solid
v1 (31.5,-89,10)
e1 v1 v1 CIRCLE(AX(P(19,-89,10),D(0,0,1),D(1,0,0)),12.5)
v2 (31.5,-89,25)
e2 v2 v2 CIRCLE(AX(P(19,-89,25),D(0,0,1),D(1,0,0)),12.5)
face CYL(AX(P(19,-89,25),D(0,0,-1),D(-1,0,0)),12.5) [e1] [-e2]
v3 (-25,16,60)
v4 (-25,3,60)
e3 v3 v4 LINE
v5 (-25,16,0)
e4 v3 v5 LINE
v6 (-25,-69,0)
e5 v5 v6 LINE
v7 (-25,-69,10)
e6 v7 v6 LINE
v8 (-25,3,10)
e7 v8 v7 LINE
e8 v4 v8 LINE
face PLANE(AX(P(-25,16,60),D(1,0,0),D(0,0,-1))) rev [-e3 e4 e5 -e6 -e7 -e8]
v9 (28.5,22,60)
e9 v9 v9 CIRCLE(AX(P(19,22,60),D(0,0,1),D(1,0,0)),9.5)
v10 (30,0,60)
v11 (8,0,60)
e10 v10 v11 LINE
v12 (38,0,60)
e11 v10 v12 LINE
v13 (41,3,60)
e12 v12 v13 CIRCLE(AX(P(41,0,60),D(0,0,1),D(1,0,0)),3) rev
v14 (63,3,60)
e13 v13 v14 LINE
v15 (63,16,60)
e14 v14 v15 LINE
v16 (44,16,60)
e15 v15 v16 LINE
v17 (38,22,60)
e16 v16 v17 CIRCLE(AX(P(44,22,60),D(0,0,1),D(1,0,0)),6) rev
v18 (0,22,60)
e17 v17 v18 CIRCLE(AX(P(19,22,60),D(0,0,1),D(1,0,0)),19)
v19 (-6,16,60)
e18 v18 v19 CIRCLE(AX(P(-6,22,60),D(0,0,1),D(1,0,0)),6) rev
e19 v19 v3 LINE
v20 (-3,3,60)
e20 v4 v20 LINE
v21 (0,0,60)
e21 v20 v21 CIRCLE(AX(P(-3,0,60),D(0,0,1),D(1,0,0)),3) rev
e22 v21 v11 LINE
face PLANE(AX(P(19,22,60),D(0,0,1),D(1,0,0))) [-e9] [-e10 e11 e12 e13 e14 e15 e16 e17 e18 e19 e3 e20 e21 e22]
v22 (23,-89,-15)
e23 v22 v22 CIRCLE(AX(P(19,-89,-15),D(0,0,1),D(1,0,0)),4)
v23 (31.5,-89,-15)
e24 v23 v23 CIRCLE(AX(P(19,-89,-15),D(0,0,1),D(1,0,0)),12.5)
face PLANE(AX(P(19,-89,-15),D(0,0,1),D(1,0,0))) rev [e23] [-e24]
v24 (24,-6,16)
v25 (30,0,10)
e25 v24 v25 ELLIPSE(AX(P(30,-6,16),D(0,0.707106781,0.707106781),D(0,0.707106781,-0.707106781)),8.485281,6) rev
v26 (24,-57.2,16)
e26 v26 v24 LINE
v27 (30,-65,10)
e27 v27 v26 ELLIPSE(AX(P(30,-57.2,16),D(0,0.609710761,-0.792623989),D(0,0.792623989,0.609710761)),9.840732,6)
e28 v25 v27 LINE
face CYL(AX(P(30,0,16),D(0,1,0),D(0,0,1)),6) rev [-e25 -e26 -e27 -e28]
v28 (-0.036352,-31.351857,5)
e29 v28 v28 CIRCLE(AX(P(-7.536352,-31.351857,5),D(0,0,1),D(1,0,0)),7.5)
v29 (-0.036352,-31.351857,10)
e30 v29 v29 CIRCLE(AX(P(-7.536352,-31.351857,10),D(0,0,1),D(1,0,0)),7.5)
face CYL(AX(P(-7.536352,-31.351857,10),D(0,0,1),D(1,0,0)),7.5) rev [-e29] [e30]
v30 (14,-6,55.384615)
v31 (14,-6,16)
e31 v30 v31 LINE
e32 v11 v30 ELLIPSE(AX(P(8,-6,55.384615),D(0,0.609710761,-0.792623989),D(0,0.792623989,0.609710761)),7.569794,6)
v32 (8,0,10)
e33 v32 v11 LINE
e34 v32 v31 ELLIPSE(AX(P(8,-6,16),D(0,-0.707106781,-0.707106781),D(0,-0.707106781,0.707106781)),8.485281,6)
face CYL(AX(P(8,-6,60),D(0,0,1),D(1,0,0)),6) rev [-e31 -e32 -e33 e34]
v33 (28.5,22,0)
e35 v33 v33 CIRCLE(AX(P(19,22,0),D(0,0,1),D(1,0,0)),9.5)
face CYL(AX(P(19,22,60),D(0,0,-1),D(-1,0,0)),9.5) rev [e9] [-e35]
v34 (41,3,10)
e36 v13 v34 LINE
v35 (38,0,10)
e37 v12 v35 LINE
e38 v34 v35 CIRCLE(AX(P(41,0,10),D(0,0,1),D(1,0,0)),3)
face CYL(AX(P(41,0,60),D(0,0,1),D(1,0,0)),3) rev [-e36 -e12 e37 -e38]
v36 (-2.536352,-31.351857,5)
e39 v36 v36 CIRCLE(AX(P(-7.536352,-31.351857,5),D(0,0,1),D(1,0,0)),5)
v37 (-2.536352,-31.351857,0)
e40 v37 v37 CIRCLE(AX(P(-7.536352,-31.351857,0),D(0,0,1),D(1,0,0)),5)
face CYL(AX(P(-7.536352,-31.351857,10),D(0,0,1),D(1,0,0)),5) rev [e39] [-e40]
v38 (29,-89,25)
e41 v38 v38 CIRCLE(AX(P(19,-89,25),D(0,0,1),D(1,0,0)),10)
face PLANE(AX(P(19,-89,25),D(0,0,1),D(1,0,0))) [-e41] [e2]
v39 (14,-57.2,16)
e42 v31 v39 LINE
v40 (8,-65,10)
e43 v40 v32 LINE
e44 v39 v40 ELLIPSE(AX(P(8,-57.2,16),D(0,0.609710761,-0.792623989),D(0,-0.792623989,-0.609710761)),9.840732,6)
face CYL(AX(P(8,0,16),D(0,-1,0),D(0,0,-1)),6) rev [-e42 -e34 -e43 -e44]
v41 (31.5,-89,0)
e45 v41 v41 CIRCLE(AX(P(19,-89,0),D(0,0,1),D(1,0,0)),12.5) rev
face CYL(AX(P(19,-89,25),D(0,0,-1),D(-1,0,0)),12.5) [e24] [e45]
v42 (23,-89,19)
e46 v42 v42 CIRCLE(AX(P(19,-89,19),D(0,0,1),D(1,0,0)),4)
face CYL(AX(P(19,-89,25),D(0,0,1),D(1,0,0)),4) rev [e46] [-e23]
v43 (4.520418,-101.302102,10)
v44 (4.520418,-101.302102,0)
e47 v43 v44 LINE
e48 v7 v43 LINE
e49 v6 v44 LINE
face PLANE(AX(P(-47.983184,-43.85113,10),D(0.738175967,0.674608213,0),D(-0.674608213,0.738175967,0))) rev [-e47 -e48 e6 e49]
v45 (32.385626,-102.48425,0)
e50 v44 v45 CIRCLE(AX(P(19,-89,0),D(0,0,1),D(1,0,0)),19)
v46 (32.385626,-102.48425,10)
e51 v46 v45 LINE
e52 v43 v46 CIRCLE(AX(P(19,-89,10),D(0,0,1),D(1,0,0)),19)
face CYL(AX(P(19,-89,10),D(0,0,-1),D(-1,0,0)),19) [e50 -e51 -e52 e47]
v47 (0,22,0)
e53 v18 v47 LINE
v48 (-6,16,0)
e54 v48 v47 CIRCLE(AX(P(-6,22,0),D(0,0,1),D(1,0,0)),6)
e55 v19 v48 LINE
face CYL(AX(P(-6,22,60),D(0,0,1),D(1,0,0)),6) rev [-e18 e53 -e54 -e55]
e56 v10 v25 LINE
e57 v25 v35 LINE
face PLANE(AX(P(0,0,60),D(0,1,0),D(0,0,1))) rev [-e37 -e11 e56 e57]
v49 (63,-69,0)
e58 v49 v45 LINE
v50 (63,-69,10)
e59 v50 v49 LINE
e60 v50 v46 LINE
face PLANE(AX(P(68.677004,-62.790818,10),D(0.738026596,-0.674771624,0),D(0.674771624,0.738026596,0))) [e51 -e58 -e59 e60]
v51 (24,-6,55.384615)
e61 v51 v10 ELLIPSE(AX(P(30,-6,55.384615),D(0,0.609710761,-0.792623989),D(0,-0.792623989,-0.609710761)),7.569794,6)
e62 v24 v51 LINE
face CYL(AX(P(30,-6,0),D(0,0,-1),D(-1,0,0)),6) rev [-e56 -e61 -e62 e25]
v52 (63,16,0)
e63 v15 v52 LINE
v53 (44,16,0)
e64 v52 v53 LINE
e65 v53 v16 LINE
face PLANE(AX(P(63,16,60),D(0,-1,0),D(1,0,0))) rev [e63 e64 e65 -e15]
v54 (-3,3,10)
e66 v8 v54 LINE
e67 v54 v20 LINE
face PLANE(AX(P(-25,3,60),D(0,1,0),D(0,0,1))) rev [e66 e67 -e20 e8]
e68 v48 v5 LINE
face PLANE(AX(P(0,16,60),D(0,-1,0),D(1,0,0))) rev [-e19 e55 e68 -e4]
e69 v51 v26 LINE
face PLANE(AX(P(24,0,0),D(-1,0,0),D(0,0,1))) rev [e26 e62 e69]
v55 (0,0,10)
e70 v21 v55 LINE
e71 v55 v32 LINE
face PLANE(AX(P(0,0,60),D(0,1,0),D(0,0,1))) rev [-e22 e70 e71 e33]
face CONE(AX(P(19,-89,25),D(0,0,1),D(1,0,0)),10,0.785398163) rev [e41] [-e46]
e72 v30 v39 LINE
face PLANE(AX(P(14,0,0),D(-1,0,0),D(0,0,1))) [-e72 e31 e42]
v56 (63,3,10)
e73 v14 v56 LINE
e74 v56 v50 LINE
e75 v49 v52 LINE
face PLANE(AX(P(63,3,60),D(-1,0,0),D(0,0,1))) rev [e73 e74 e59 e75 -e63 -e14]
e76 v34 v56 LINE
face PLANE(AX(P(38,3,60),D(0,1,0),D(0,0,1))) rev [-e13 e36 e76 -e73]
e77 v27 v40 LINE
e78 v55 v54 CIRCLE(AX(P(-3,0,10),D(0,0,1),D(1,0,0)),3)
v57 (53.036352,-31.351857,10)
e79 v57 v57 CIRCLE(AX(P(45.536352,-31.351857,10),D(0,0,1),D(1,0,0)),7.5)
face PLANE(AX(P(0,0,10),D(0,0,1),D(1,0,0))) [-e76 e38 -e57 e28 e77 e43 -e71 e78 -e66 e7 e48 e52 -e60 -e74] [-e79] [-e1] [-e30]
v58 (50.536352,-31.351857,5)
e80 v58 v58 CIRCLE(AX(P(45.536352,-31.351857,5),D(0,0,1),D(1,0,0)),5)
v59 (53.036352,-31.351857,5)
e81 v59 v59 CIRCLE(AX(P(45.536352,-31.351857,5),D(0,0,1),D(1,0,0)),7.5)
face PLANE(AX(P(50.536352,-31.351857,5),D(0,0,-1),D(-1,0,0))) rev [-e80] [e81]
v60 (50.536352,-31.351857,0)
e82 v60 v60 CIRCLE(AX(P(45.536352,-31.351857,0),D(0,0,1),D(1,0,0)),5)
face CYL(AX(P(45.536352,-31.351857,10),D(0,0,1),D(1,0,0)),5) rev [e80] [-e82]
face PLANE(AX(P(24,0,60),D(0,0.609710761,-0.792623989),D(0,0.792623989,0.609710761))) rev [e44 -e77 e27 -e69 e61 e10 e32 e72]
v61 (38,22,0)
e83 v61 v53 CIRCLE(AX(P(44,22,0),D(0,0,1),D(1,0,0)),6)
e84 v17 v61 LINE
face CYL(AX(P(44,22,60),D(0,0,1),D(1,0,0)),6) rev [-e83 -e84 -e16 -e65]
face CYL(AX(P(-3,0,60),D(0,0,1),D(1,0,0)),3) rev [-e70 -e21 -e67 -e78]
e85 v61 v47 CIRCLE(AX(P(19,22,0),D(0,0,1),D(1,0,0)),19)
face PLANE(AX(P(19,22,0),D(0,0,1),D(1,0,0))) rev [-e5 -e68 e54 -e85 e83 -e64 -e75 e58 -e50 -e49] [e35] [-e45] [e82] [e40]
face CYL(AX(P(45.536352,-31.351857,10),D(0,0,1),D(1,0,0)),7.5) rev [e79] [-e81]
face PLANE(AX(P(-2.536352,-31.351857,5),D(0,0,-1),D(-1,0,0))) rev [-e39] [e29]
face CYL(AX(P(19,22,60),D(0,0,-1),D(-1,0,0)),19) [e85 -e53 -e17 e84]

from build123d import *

# Parameters (mm, degrees)
SKETCH1_R           = 9.5
BOSS_EXTRUDE1_DEPTH = 60
BOSS_EXTRUDE2_DEPTH = 10
FILLET1_R           = 6
FILLET2_R           = 6
FILLET3_R           = 3
BOSS_EXTRUDE4_DEPTH = 5
FILLET4_R           = 6
FILLET5_R           = 6
SKETCH6_R           = 12.5
BOSS_EXTRUDE5_DEPTH = 20
HOLE2_D             = 8
HOLE2_DEPTH         = 39.547439867
HOLE2_CSINK_D       = 20
HOLE2_CSINK_ANGLE   = 90
CUT_EXTRUDE1_START  = -40
SKETCH13_R          = 4
CUT_EXTRUDE1_DEPTH  = 40
HOLE4_D             = 10
HOLE4_CBORE_D       = 15
HOLE4_CBORE_DEPTH   = 5


# Some blends are built 0.0001 mm under size
with BuildPart() as part:
    # Sketch1 → Boss-Extrude1 (new body)
    with BuildSketch(Plane.XY):
        with BuildLine():
            Line((0, 0), (38, 0))
            Line((38, 0), (38, 3))
            Line((38, 3), (63, 3))
            Line((63, 3), (63, 16))
            Line((63, 16), (38, 16))
            Line((38, 16), (38, 22))
            ThreePointArc((38, 22), (19, 41), (0, 22))
            Line((0, 22), (0, 16))
            Line((0, 16), (-25, 16))
            Line((-25, 16), (-25, 3))
            Line((-25, 3), (0, 3))
            Line((0, 3), (0, 0))
        make_face()
        with Locations((19, 22)):
            Circle(SKETCH1_R, mode=Mode.SUBTRACT)
    extrude(amount=BOSS_EXTRUDE1_DEPTH)

    # Sketch2 → Boss-Extrude2 (add)
    with BuildSketch(Plane.XY):
        with BuildLine():
            Line((63, -69), (63, 3))
            Line((63, 3), (38, 3))
            Line((38, 3), (38, 0))
            Line((38, 0), (19, 0))
            Line((19, 0), (0, 0))
            Line((0, 0), (0, 3))
            Line((0, 3), (-25, 3))
            Line((-25, 3), (-25, -69))
            Line((-25, -69), (4.520418495, -101.302102237))
            ThreePointArc((4.520418495, -101.302102237), (18.194672039, -107.98292514), (32.385626244, -102.484250445))
            Line((32.385626244, -102.484250445), (33.626524101, -101.127027365))
            Line((33.626524101, -101.127027365), (63, -69))
        make_face()
        with BuildLine():
            ThreePointArc((19, -101.5), (6.5, -89), (19, -76.5))
            ThreePointArc((19, -76.5), (27.838834765, -80.161165235), (31.5, -89))
            ThreePointArc((31.5, -89), (27.838834765, -97.838834765), (19, -101.5))
        make_face(mode=Mode.SUBTRACT)
    extrude(amount=BOSS_EXTRUDE2_DEPTH)

    # Fillet1
    fillet1_edges = [part.edges().sort_by_distance(p)[0] for p in [
        (0, 16, 30),
    ]]
    fillet(fillet1_edges, radius=FILLET1_R - 0.0001)  # a hair under: the kernel refuses the full size

    # Fillet2
    fillet2_edges = [part.edges().sort_by_distance(p)[0] for p in [
        (38, 16, 30),
    ]]
    fillet(fillet2_edges, radius=FILLET2_R - 0.0001)  # a hair under: the kernel refuses the full size

    # Fillet3
    fillet3_edges = [part.edges().sort_by_distance(p)[0] for p in [
        (0, 3, 35),
        (38, 3, 35),
    ]]
    fillet(fillet3_edges, radius=FILLET3_R - 0.0001)  # a hair under: the kernel refuses the full size

    # Sketch4 → Boss-Extrude4 (add, symmetric)
    with BuildSketch(Plane(origin=(19, 0, 0), x_dir=(0, 0, -1), z_dir=(1, 0, 0))):
        Polygon((-60, 0), (-10, -65), (-10, 0), align=None)
    extrude(amount=BOSS_EXTRUDE4_DEPTH, both=True)

    # Fillet4
    # the kernel refuses this fillet: 6 mm, written as the material it adds along each edge
    with BuildSketch(Plane(origin=(14, 0, -5), x_dir=(-1, 0, 0), z_dir=(0, 0, 1))) as fillet4_piece_1_section:
        with BuildLine():
            CenterArc((FILLET4_R, FILLET4_R), FILLET4_R, 180, 90)
            Line((0, FILLET4_R), (0, 0))
            Line((0, 0), (FILLET4_R, 0))
        make_face()
    fillet4_piece_1 = extrude(amount=80, mode=Mode.PRIVATE)
    fillet4_piece_1 = split(fillet4_piece_1, bisect_by=Plane(origin=(12.648095827, -13.156695973, 49.879464636), z_dir=(0, 0.6097107608496924, -0.7926239891046001)), keep=Keep.TOP, mode=Mode.PRIVATE)
    fillet4_piece_1 = split(fillet4_piece_1, bisect_by=Plane(origin=(12.648095827, -1.320325191, 0), z_dir=(0, 0, 1)), keep=Keep.TOP, mode=Mode.PRIVATE)
    add(fillet4_piece_1)
    with BuildSketch(Plane(origin=(24, 0, -5), x_dir=(1, 0, 0), z_dir=(0, 0, 1))) as fillet4_piece_2_section:
        with BuildLine():
            CenterArc((FILLET4_R, -FILLET4_R), FILLET4_R, 90, 90)
            Line((0, -FILLET4_R), (0, 0))
            Line((0, 0), (FILLET4_R, 0))
        make_face()
    fillet4_piece_2 = extrude(amount=80, mode=Mode.PRIVATE)
    fillet4_piece_2 = split(fillet4_piece_2, bisect_by=Plane(origin=(25.351904173, -13.156695973, 49.879464636), z_dir=(0, 0.6097107608496924, -0.7926239891046001)), keep=Keep.TOP, mode=Mode.PRIVATE)
    fillet4_piece_2 = split(fillet4_piece_2, bisect_by=Plane(origin=(25.351904173, -1.320325191, 0), z_dir=(0, 0, 1)), keep=Keep.TOP, mode=Mode.PRIVATE)
    add(fillet4_piece_2)

    # Fillet5
    # the kernel refuses this fillet: 6 mm, written as the material it adds along each edge
    with BuildSketch(Plane(origin=(24, -80, 10), x_dir=(1, 0, 0), z_dir=(0, 1, 0))) as fillet5_piece_1_section:
        with BuildLine():
            CenterArc((FILLET5_R, -FILLET5_R), FILLET5_R, 90, 90)
            Line((0, -FILLET5_R), (0, 0))
            Line((0, 0), (FILLET5_R, 0))
        make_face()
    fillet5_piece_1 = extrude(amount=89, mode=Mode.PRIVATE)
    fillet5_piece_1 = split(fillet5_piece_1, bisect_by=Plane(origin=(25.330544352, -46.320917546, 24.368524964), z_dir=(0, 0.6097107608496924, -0.7926239891046002)), keep=Keep.TOP, mode=Mode.PRIVATE)
    add(fillet5_piece_1)
    with BuildSketch(Plane(origin=(14, -80, 10), x_dir=(-1, 0, 0), z_dir=(0, 1, 0))) as fillet5_piece_2_section:
        with BuildLine():
            CenterArc((FILLET5_R, FILLET5_R), FILLET5_R, 180, 90)
            Line((0, FILLET5_R), (0, 0))
            Line((0, 0), (FILLET5_R, 0))
        make_face()
    fillet5_piece_2 = extrude(amount=89, mode=Mode.PRIVATE)
    fillet5_piece_2 = split(fillet5_piece_2, bisect_by=Plane(origin=(12.669455648, -46.320917546, 24.368524964), z_dir=(0, 0.6097107608496924, -0.7926239891046002)), keep=Keep.TOP, mode=Mode.PRIVATE)
    add(fillet5_piece_2)

    # Sketch6 → Boss-Extrude5 (add, symmetric)
    with BuildSketch(Plane.XY.offset(5)):
        with Locations((19, -89)):
            Circle(SKETCH6_R)
    extrude(amount=BOSS_EXTRUDE5_DEPTH, both=True)

    # Hole2
    with Locations(Plane.XY.offset(25)):
        with Locations((19, -89)):
            CounterSinkHole(HOLE2_D / 2, HOLE2_CSINK_D / 2, depth=HOLE2_DEPTH, counter_sink_angle=HOLE2_CSINK_ANGLE)

    # Sketch13 → Cut-Extrude1 (cut)
    with BuildSketch(Plane.XY.offset(-14.547439867).offset(CUT_EXTRUDE1_START)):
        with Locations((19, -89)):
            Circle(SKETCH13_R)
    extrude(amount=CUT_EXTRUDE1_DEPTH, mode=Mode.SUBTRACT)

    # Hole4 (through all)
    with Locations(Plane(origin=(-7.536351987, -31.351857419, 10), x_dir=(1, 0, 0), z_dir=(0, 0, 1))):
        with Locations((0, 0)):
            hole4 = CounterBoreHole(HOLE4_D / 2, HOLE4_CBORE_D / 2, HOLE4_CBORE_DEPTH)

    # Mirror2: Hole4 across plane
    add(hole4.mirror(Plane(origin=(19, 0, 0), x_dir=(0, 0, 1), z_dir=(1, 0, 0))), mode=Mode.SUBTRACT)


solid = part.part
